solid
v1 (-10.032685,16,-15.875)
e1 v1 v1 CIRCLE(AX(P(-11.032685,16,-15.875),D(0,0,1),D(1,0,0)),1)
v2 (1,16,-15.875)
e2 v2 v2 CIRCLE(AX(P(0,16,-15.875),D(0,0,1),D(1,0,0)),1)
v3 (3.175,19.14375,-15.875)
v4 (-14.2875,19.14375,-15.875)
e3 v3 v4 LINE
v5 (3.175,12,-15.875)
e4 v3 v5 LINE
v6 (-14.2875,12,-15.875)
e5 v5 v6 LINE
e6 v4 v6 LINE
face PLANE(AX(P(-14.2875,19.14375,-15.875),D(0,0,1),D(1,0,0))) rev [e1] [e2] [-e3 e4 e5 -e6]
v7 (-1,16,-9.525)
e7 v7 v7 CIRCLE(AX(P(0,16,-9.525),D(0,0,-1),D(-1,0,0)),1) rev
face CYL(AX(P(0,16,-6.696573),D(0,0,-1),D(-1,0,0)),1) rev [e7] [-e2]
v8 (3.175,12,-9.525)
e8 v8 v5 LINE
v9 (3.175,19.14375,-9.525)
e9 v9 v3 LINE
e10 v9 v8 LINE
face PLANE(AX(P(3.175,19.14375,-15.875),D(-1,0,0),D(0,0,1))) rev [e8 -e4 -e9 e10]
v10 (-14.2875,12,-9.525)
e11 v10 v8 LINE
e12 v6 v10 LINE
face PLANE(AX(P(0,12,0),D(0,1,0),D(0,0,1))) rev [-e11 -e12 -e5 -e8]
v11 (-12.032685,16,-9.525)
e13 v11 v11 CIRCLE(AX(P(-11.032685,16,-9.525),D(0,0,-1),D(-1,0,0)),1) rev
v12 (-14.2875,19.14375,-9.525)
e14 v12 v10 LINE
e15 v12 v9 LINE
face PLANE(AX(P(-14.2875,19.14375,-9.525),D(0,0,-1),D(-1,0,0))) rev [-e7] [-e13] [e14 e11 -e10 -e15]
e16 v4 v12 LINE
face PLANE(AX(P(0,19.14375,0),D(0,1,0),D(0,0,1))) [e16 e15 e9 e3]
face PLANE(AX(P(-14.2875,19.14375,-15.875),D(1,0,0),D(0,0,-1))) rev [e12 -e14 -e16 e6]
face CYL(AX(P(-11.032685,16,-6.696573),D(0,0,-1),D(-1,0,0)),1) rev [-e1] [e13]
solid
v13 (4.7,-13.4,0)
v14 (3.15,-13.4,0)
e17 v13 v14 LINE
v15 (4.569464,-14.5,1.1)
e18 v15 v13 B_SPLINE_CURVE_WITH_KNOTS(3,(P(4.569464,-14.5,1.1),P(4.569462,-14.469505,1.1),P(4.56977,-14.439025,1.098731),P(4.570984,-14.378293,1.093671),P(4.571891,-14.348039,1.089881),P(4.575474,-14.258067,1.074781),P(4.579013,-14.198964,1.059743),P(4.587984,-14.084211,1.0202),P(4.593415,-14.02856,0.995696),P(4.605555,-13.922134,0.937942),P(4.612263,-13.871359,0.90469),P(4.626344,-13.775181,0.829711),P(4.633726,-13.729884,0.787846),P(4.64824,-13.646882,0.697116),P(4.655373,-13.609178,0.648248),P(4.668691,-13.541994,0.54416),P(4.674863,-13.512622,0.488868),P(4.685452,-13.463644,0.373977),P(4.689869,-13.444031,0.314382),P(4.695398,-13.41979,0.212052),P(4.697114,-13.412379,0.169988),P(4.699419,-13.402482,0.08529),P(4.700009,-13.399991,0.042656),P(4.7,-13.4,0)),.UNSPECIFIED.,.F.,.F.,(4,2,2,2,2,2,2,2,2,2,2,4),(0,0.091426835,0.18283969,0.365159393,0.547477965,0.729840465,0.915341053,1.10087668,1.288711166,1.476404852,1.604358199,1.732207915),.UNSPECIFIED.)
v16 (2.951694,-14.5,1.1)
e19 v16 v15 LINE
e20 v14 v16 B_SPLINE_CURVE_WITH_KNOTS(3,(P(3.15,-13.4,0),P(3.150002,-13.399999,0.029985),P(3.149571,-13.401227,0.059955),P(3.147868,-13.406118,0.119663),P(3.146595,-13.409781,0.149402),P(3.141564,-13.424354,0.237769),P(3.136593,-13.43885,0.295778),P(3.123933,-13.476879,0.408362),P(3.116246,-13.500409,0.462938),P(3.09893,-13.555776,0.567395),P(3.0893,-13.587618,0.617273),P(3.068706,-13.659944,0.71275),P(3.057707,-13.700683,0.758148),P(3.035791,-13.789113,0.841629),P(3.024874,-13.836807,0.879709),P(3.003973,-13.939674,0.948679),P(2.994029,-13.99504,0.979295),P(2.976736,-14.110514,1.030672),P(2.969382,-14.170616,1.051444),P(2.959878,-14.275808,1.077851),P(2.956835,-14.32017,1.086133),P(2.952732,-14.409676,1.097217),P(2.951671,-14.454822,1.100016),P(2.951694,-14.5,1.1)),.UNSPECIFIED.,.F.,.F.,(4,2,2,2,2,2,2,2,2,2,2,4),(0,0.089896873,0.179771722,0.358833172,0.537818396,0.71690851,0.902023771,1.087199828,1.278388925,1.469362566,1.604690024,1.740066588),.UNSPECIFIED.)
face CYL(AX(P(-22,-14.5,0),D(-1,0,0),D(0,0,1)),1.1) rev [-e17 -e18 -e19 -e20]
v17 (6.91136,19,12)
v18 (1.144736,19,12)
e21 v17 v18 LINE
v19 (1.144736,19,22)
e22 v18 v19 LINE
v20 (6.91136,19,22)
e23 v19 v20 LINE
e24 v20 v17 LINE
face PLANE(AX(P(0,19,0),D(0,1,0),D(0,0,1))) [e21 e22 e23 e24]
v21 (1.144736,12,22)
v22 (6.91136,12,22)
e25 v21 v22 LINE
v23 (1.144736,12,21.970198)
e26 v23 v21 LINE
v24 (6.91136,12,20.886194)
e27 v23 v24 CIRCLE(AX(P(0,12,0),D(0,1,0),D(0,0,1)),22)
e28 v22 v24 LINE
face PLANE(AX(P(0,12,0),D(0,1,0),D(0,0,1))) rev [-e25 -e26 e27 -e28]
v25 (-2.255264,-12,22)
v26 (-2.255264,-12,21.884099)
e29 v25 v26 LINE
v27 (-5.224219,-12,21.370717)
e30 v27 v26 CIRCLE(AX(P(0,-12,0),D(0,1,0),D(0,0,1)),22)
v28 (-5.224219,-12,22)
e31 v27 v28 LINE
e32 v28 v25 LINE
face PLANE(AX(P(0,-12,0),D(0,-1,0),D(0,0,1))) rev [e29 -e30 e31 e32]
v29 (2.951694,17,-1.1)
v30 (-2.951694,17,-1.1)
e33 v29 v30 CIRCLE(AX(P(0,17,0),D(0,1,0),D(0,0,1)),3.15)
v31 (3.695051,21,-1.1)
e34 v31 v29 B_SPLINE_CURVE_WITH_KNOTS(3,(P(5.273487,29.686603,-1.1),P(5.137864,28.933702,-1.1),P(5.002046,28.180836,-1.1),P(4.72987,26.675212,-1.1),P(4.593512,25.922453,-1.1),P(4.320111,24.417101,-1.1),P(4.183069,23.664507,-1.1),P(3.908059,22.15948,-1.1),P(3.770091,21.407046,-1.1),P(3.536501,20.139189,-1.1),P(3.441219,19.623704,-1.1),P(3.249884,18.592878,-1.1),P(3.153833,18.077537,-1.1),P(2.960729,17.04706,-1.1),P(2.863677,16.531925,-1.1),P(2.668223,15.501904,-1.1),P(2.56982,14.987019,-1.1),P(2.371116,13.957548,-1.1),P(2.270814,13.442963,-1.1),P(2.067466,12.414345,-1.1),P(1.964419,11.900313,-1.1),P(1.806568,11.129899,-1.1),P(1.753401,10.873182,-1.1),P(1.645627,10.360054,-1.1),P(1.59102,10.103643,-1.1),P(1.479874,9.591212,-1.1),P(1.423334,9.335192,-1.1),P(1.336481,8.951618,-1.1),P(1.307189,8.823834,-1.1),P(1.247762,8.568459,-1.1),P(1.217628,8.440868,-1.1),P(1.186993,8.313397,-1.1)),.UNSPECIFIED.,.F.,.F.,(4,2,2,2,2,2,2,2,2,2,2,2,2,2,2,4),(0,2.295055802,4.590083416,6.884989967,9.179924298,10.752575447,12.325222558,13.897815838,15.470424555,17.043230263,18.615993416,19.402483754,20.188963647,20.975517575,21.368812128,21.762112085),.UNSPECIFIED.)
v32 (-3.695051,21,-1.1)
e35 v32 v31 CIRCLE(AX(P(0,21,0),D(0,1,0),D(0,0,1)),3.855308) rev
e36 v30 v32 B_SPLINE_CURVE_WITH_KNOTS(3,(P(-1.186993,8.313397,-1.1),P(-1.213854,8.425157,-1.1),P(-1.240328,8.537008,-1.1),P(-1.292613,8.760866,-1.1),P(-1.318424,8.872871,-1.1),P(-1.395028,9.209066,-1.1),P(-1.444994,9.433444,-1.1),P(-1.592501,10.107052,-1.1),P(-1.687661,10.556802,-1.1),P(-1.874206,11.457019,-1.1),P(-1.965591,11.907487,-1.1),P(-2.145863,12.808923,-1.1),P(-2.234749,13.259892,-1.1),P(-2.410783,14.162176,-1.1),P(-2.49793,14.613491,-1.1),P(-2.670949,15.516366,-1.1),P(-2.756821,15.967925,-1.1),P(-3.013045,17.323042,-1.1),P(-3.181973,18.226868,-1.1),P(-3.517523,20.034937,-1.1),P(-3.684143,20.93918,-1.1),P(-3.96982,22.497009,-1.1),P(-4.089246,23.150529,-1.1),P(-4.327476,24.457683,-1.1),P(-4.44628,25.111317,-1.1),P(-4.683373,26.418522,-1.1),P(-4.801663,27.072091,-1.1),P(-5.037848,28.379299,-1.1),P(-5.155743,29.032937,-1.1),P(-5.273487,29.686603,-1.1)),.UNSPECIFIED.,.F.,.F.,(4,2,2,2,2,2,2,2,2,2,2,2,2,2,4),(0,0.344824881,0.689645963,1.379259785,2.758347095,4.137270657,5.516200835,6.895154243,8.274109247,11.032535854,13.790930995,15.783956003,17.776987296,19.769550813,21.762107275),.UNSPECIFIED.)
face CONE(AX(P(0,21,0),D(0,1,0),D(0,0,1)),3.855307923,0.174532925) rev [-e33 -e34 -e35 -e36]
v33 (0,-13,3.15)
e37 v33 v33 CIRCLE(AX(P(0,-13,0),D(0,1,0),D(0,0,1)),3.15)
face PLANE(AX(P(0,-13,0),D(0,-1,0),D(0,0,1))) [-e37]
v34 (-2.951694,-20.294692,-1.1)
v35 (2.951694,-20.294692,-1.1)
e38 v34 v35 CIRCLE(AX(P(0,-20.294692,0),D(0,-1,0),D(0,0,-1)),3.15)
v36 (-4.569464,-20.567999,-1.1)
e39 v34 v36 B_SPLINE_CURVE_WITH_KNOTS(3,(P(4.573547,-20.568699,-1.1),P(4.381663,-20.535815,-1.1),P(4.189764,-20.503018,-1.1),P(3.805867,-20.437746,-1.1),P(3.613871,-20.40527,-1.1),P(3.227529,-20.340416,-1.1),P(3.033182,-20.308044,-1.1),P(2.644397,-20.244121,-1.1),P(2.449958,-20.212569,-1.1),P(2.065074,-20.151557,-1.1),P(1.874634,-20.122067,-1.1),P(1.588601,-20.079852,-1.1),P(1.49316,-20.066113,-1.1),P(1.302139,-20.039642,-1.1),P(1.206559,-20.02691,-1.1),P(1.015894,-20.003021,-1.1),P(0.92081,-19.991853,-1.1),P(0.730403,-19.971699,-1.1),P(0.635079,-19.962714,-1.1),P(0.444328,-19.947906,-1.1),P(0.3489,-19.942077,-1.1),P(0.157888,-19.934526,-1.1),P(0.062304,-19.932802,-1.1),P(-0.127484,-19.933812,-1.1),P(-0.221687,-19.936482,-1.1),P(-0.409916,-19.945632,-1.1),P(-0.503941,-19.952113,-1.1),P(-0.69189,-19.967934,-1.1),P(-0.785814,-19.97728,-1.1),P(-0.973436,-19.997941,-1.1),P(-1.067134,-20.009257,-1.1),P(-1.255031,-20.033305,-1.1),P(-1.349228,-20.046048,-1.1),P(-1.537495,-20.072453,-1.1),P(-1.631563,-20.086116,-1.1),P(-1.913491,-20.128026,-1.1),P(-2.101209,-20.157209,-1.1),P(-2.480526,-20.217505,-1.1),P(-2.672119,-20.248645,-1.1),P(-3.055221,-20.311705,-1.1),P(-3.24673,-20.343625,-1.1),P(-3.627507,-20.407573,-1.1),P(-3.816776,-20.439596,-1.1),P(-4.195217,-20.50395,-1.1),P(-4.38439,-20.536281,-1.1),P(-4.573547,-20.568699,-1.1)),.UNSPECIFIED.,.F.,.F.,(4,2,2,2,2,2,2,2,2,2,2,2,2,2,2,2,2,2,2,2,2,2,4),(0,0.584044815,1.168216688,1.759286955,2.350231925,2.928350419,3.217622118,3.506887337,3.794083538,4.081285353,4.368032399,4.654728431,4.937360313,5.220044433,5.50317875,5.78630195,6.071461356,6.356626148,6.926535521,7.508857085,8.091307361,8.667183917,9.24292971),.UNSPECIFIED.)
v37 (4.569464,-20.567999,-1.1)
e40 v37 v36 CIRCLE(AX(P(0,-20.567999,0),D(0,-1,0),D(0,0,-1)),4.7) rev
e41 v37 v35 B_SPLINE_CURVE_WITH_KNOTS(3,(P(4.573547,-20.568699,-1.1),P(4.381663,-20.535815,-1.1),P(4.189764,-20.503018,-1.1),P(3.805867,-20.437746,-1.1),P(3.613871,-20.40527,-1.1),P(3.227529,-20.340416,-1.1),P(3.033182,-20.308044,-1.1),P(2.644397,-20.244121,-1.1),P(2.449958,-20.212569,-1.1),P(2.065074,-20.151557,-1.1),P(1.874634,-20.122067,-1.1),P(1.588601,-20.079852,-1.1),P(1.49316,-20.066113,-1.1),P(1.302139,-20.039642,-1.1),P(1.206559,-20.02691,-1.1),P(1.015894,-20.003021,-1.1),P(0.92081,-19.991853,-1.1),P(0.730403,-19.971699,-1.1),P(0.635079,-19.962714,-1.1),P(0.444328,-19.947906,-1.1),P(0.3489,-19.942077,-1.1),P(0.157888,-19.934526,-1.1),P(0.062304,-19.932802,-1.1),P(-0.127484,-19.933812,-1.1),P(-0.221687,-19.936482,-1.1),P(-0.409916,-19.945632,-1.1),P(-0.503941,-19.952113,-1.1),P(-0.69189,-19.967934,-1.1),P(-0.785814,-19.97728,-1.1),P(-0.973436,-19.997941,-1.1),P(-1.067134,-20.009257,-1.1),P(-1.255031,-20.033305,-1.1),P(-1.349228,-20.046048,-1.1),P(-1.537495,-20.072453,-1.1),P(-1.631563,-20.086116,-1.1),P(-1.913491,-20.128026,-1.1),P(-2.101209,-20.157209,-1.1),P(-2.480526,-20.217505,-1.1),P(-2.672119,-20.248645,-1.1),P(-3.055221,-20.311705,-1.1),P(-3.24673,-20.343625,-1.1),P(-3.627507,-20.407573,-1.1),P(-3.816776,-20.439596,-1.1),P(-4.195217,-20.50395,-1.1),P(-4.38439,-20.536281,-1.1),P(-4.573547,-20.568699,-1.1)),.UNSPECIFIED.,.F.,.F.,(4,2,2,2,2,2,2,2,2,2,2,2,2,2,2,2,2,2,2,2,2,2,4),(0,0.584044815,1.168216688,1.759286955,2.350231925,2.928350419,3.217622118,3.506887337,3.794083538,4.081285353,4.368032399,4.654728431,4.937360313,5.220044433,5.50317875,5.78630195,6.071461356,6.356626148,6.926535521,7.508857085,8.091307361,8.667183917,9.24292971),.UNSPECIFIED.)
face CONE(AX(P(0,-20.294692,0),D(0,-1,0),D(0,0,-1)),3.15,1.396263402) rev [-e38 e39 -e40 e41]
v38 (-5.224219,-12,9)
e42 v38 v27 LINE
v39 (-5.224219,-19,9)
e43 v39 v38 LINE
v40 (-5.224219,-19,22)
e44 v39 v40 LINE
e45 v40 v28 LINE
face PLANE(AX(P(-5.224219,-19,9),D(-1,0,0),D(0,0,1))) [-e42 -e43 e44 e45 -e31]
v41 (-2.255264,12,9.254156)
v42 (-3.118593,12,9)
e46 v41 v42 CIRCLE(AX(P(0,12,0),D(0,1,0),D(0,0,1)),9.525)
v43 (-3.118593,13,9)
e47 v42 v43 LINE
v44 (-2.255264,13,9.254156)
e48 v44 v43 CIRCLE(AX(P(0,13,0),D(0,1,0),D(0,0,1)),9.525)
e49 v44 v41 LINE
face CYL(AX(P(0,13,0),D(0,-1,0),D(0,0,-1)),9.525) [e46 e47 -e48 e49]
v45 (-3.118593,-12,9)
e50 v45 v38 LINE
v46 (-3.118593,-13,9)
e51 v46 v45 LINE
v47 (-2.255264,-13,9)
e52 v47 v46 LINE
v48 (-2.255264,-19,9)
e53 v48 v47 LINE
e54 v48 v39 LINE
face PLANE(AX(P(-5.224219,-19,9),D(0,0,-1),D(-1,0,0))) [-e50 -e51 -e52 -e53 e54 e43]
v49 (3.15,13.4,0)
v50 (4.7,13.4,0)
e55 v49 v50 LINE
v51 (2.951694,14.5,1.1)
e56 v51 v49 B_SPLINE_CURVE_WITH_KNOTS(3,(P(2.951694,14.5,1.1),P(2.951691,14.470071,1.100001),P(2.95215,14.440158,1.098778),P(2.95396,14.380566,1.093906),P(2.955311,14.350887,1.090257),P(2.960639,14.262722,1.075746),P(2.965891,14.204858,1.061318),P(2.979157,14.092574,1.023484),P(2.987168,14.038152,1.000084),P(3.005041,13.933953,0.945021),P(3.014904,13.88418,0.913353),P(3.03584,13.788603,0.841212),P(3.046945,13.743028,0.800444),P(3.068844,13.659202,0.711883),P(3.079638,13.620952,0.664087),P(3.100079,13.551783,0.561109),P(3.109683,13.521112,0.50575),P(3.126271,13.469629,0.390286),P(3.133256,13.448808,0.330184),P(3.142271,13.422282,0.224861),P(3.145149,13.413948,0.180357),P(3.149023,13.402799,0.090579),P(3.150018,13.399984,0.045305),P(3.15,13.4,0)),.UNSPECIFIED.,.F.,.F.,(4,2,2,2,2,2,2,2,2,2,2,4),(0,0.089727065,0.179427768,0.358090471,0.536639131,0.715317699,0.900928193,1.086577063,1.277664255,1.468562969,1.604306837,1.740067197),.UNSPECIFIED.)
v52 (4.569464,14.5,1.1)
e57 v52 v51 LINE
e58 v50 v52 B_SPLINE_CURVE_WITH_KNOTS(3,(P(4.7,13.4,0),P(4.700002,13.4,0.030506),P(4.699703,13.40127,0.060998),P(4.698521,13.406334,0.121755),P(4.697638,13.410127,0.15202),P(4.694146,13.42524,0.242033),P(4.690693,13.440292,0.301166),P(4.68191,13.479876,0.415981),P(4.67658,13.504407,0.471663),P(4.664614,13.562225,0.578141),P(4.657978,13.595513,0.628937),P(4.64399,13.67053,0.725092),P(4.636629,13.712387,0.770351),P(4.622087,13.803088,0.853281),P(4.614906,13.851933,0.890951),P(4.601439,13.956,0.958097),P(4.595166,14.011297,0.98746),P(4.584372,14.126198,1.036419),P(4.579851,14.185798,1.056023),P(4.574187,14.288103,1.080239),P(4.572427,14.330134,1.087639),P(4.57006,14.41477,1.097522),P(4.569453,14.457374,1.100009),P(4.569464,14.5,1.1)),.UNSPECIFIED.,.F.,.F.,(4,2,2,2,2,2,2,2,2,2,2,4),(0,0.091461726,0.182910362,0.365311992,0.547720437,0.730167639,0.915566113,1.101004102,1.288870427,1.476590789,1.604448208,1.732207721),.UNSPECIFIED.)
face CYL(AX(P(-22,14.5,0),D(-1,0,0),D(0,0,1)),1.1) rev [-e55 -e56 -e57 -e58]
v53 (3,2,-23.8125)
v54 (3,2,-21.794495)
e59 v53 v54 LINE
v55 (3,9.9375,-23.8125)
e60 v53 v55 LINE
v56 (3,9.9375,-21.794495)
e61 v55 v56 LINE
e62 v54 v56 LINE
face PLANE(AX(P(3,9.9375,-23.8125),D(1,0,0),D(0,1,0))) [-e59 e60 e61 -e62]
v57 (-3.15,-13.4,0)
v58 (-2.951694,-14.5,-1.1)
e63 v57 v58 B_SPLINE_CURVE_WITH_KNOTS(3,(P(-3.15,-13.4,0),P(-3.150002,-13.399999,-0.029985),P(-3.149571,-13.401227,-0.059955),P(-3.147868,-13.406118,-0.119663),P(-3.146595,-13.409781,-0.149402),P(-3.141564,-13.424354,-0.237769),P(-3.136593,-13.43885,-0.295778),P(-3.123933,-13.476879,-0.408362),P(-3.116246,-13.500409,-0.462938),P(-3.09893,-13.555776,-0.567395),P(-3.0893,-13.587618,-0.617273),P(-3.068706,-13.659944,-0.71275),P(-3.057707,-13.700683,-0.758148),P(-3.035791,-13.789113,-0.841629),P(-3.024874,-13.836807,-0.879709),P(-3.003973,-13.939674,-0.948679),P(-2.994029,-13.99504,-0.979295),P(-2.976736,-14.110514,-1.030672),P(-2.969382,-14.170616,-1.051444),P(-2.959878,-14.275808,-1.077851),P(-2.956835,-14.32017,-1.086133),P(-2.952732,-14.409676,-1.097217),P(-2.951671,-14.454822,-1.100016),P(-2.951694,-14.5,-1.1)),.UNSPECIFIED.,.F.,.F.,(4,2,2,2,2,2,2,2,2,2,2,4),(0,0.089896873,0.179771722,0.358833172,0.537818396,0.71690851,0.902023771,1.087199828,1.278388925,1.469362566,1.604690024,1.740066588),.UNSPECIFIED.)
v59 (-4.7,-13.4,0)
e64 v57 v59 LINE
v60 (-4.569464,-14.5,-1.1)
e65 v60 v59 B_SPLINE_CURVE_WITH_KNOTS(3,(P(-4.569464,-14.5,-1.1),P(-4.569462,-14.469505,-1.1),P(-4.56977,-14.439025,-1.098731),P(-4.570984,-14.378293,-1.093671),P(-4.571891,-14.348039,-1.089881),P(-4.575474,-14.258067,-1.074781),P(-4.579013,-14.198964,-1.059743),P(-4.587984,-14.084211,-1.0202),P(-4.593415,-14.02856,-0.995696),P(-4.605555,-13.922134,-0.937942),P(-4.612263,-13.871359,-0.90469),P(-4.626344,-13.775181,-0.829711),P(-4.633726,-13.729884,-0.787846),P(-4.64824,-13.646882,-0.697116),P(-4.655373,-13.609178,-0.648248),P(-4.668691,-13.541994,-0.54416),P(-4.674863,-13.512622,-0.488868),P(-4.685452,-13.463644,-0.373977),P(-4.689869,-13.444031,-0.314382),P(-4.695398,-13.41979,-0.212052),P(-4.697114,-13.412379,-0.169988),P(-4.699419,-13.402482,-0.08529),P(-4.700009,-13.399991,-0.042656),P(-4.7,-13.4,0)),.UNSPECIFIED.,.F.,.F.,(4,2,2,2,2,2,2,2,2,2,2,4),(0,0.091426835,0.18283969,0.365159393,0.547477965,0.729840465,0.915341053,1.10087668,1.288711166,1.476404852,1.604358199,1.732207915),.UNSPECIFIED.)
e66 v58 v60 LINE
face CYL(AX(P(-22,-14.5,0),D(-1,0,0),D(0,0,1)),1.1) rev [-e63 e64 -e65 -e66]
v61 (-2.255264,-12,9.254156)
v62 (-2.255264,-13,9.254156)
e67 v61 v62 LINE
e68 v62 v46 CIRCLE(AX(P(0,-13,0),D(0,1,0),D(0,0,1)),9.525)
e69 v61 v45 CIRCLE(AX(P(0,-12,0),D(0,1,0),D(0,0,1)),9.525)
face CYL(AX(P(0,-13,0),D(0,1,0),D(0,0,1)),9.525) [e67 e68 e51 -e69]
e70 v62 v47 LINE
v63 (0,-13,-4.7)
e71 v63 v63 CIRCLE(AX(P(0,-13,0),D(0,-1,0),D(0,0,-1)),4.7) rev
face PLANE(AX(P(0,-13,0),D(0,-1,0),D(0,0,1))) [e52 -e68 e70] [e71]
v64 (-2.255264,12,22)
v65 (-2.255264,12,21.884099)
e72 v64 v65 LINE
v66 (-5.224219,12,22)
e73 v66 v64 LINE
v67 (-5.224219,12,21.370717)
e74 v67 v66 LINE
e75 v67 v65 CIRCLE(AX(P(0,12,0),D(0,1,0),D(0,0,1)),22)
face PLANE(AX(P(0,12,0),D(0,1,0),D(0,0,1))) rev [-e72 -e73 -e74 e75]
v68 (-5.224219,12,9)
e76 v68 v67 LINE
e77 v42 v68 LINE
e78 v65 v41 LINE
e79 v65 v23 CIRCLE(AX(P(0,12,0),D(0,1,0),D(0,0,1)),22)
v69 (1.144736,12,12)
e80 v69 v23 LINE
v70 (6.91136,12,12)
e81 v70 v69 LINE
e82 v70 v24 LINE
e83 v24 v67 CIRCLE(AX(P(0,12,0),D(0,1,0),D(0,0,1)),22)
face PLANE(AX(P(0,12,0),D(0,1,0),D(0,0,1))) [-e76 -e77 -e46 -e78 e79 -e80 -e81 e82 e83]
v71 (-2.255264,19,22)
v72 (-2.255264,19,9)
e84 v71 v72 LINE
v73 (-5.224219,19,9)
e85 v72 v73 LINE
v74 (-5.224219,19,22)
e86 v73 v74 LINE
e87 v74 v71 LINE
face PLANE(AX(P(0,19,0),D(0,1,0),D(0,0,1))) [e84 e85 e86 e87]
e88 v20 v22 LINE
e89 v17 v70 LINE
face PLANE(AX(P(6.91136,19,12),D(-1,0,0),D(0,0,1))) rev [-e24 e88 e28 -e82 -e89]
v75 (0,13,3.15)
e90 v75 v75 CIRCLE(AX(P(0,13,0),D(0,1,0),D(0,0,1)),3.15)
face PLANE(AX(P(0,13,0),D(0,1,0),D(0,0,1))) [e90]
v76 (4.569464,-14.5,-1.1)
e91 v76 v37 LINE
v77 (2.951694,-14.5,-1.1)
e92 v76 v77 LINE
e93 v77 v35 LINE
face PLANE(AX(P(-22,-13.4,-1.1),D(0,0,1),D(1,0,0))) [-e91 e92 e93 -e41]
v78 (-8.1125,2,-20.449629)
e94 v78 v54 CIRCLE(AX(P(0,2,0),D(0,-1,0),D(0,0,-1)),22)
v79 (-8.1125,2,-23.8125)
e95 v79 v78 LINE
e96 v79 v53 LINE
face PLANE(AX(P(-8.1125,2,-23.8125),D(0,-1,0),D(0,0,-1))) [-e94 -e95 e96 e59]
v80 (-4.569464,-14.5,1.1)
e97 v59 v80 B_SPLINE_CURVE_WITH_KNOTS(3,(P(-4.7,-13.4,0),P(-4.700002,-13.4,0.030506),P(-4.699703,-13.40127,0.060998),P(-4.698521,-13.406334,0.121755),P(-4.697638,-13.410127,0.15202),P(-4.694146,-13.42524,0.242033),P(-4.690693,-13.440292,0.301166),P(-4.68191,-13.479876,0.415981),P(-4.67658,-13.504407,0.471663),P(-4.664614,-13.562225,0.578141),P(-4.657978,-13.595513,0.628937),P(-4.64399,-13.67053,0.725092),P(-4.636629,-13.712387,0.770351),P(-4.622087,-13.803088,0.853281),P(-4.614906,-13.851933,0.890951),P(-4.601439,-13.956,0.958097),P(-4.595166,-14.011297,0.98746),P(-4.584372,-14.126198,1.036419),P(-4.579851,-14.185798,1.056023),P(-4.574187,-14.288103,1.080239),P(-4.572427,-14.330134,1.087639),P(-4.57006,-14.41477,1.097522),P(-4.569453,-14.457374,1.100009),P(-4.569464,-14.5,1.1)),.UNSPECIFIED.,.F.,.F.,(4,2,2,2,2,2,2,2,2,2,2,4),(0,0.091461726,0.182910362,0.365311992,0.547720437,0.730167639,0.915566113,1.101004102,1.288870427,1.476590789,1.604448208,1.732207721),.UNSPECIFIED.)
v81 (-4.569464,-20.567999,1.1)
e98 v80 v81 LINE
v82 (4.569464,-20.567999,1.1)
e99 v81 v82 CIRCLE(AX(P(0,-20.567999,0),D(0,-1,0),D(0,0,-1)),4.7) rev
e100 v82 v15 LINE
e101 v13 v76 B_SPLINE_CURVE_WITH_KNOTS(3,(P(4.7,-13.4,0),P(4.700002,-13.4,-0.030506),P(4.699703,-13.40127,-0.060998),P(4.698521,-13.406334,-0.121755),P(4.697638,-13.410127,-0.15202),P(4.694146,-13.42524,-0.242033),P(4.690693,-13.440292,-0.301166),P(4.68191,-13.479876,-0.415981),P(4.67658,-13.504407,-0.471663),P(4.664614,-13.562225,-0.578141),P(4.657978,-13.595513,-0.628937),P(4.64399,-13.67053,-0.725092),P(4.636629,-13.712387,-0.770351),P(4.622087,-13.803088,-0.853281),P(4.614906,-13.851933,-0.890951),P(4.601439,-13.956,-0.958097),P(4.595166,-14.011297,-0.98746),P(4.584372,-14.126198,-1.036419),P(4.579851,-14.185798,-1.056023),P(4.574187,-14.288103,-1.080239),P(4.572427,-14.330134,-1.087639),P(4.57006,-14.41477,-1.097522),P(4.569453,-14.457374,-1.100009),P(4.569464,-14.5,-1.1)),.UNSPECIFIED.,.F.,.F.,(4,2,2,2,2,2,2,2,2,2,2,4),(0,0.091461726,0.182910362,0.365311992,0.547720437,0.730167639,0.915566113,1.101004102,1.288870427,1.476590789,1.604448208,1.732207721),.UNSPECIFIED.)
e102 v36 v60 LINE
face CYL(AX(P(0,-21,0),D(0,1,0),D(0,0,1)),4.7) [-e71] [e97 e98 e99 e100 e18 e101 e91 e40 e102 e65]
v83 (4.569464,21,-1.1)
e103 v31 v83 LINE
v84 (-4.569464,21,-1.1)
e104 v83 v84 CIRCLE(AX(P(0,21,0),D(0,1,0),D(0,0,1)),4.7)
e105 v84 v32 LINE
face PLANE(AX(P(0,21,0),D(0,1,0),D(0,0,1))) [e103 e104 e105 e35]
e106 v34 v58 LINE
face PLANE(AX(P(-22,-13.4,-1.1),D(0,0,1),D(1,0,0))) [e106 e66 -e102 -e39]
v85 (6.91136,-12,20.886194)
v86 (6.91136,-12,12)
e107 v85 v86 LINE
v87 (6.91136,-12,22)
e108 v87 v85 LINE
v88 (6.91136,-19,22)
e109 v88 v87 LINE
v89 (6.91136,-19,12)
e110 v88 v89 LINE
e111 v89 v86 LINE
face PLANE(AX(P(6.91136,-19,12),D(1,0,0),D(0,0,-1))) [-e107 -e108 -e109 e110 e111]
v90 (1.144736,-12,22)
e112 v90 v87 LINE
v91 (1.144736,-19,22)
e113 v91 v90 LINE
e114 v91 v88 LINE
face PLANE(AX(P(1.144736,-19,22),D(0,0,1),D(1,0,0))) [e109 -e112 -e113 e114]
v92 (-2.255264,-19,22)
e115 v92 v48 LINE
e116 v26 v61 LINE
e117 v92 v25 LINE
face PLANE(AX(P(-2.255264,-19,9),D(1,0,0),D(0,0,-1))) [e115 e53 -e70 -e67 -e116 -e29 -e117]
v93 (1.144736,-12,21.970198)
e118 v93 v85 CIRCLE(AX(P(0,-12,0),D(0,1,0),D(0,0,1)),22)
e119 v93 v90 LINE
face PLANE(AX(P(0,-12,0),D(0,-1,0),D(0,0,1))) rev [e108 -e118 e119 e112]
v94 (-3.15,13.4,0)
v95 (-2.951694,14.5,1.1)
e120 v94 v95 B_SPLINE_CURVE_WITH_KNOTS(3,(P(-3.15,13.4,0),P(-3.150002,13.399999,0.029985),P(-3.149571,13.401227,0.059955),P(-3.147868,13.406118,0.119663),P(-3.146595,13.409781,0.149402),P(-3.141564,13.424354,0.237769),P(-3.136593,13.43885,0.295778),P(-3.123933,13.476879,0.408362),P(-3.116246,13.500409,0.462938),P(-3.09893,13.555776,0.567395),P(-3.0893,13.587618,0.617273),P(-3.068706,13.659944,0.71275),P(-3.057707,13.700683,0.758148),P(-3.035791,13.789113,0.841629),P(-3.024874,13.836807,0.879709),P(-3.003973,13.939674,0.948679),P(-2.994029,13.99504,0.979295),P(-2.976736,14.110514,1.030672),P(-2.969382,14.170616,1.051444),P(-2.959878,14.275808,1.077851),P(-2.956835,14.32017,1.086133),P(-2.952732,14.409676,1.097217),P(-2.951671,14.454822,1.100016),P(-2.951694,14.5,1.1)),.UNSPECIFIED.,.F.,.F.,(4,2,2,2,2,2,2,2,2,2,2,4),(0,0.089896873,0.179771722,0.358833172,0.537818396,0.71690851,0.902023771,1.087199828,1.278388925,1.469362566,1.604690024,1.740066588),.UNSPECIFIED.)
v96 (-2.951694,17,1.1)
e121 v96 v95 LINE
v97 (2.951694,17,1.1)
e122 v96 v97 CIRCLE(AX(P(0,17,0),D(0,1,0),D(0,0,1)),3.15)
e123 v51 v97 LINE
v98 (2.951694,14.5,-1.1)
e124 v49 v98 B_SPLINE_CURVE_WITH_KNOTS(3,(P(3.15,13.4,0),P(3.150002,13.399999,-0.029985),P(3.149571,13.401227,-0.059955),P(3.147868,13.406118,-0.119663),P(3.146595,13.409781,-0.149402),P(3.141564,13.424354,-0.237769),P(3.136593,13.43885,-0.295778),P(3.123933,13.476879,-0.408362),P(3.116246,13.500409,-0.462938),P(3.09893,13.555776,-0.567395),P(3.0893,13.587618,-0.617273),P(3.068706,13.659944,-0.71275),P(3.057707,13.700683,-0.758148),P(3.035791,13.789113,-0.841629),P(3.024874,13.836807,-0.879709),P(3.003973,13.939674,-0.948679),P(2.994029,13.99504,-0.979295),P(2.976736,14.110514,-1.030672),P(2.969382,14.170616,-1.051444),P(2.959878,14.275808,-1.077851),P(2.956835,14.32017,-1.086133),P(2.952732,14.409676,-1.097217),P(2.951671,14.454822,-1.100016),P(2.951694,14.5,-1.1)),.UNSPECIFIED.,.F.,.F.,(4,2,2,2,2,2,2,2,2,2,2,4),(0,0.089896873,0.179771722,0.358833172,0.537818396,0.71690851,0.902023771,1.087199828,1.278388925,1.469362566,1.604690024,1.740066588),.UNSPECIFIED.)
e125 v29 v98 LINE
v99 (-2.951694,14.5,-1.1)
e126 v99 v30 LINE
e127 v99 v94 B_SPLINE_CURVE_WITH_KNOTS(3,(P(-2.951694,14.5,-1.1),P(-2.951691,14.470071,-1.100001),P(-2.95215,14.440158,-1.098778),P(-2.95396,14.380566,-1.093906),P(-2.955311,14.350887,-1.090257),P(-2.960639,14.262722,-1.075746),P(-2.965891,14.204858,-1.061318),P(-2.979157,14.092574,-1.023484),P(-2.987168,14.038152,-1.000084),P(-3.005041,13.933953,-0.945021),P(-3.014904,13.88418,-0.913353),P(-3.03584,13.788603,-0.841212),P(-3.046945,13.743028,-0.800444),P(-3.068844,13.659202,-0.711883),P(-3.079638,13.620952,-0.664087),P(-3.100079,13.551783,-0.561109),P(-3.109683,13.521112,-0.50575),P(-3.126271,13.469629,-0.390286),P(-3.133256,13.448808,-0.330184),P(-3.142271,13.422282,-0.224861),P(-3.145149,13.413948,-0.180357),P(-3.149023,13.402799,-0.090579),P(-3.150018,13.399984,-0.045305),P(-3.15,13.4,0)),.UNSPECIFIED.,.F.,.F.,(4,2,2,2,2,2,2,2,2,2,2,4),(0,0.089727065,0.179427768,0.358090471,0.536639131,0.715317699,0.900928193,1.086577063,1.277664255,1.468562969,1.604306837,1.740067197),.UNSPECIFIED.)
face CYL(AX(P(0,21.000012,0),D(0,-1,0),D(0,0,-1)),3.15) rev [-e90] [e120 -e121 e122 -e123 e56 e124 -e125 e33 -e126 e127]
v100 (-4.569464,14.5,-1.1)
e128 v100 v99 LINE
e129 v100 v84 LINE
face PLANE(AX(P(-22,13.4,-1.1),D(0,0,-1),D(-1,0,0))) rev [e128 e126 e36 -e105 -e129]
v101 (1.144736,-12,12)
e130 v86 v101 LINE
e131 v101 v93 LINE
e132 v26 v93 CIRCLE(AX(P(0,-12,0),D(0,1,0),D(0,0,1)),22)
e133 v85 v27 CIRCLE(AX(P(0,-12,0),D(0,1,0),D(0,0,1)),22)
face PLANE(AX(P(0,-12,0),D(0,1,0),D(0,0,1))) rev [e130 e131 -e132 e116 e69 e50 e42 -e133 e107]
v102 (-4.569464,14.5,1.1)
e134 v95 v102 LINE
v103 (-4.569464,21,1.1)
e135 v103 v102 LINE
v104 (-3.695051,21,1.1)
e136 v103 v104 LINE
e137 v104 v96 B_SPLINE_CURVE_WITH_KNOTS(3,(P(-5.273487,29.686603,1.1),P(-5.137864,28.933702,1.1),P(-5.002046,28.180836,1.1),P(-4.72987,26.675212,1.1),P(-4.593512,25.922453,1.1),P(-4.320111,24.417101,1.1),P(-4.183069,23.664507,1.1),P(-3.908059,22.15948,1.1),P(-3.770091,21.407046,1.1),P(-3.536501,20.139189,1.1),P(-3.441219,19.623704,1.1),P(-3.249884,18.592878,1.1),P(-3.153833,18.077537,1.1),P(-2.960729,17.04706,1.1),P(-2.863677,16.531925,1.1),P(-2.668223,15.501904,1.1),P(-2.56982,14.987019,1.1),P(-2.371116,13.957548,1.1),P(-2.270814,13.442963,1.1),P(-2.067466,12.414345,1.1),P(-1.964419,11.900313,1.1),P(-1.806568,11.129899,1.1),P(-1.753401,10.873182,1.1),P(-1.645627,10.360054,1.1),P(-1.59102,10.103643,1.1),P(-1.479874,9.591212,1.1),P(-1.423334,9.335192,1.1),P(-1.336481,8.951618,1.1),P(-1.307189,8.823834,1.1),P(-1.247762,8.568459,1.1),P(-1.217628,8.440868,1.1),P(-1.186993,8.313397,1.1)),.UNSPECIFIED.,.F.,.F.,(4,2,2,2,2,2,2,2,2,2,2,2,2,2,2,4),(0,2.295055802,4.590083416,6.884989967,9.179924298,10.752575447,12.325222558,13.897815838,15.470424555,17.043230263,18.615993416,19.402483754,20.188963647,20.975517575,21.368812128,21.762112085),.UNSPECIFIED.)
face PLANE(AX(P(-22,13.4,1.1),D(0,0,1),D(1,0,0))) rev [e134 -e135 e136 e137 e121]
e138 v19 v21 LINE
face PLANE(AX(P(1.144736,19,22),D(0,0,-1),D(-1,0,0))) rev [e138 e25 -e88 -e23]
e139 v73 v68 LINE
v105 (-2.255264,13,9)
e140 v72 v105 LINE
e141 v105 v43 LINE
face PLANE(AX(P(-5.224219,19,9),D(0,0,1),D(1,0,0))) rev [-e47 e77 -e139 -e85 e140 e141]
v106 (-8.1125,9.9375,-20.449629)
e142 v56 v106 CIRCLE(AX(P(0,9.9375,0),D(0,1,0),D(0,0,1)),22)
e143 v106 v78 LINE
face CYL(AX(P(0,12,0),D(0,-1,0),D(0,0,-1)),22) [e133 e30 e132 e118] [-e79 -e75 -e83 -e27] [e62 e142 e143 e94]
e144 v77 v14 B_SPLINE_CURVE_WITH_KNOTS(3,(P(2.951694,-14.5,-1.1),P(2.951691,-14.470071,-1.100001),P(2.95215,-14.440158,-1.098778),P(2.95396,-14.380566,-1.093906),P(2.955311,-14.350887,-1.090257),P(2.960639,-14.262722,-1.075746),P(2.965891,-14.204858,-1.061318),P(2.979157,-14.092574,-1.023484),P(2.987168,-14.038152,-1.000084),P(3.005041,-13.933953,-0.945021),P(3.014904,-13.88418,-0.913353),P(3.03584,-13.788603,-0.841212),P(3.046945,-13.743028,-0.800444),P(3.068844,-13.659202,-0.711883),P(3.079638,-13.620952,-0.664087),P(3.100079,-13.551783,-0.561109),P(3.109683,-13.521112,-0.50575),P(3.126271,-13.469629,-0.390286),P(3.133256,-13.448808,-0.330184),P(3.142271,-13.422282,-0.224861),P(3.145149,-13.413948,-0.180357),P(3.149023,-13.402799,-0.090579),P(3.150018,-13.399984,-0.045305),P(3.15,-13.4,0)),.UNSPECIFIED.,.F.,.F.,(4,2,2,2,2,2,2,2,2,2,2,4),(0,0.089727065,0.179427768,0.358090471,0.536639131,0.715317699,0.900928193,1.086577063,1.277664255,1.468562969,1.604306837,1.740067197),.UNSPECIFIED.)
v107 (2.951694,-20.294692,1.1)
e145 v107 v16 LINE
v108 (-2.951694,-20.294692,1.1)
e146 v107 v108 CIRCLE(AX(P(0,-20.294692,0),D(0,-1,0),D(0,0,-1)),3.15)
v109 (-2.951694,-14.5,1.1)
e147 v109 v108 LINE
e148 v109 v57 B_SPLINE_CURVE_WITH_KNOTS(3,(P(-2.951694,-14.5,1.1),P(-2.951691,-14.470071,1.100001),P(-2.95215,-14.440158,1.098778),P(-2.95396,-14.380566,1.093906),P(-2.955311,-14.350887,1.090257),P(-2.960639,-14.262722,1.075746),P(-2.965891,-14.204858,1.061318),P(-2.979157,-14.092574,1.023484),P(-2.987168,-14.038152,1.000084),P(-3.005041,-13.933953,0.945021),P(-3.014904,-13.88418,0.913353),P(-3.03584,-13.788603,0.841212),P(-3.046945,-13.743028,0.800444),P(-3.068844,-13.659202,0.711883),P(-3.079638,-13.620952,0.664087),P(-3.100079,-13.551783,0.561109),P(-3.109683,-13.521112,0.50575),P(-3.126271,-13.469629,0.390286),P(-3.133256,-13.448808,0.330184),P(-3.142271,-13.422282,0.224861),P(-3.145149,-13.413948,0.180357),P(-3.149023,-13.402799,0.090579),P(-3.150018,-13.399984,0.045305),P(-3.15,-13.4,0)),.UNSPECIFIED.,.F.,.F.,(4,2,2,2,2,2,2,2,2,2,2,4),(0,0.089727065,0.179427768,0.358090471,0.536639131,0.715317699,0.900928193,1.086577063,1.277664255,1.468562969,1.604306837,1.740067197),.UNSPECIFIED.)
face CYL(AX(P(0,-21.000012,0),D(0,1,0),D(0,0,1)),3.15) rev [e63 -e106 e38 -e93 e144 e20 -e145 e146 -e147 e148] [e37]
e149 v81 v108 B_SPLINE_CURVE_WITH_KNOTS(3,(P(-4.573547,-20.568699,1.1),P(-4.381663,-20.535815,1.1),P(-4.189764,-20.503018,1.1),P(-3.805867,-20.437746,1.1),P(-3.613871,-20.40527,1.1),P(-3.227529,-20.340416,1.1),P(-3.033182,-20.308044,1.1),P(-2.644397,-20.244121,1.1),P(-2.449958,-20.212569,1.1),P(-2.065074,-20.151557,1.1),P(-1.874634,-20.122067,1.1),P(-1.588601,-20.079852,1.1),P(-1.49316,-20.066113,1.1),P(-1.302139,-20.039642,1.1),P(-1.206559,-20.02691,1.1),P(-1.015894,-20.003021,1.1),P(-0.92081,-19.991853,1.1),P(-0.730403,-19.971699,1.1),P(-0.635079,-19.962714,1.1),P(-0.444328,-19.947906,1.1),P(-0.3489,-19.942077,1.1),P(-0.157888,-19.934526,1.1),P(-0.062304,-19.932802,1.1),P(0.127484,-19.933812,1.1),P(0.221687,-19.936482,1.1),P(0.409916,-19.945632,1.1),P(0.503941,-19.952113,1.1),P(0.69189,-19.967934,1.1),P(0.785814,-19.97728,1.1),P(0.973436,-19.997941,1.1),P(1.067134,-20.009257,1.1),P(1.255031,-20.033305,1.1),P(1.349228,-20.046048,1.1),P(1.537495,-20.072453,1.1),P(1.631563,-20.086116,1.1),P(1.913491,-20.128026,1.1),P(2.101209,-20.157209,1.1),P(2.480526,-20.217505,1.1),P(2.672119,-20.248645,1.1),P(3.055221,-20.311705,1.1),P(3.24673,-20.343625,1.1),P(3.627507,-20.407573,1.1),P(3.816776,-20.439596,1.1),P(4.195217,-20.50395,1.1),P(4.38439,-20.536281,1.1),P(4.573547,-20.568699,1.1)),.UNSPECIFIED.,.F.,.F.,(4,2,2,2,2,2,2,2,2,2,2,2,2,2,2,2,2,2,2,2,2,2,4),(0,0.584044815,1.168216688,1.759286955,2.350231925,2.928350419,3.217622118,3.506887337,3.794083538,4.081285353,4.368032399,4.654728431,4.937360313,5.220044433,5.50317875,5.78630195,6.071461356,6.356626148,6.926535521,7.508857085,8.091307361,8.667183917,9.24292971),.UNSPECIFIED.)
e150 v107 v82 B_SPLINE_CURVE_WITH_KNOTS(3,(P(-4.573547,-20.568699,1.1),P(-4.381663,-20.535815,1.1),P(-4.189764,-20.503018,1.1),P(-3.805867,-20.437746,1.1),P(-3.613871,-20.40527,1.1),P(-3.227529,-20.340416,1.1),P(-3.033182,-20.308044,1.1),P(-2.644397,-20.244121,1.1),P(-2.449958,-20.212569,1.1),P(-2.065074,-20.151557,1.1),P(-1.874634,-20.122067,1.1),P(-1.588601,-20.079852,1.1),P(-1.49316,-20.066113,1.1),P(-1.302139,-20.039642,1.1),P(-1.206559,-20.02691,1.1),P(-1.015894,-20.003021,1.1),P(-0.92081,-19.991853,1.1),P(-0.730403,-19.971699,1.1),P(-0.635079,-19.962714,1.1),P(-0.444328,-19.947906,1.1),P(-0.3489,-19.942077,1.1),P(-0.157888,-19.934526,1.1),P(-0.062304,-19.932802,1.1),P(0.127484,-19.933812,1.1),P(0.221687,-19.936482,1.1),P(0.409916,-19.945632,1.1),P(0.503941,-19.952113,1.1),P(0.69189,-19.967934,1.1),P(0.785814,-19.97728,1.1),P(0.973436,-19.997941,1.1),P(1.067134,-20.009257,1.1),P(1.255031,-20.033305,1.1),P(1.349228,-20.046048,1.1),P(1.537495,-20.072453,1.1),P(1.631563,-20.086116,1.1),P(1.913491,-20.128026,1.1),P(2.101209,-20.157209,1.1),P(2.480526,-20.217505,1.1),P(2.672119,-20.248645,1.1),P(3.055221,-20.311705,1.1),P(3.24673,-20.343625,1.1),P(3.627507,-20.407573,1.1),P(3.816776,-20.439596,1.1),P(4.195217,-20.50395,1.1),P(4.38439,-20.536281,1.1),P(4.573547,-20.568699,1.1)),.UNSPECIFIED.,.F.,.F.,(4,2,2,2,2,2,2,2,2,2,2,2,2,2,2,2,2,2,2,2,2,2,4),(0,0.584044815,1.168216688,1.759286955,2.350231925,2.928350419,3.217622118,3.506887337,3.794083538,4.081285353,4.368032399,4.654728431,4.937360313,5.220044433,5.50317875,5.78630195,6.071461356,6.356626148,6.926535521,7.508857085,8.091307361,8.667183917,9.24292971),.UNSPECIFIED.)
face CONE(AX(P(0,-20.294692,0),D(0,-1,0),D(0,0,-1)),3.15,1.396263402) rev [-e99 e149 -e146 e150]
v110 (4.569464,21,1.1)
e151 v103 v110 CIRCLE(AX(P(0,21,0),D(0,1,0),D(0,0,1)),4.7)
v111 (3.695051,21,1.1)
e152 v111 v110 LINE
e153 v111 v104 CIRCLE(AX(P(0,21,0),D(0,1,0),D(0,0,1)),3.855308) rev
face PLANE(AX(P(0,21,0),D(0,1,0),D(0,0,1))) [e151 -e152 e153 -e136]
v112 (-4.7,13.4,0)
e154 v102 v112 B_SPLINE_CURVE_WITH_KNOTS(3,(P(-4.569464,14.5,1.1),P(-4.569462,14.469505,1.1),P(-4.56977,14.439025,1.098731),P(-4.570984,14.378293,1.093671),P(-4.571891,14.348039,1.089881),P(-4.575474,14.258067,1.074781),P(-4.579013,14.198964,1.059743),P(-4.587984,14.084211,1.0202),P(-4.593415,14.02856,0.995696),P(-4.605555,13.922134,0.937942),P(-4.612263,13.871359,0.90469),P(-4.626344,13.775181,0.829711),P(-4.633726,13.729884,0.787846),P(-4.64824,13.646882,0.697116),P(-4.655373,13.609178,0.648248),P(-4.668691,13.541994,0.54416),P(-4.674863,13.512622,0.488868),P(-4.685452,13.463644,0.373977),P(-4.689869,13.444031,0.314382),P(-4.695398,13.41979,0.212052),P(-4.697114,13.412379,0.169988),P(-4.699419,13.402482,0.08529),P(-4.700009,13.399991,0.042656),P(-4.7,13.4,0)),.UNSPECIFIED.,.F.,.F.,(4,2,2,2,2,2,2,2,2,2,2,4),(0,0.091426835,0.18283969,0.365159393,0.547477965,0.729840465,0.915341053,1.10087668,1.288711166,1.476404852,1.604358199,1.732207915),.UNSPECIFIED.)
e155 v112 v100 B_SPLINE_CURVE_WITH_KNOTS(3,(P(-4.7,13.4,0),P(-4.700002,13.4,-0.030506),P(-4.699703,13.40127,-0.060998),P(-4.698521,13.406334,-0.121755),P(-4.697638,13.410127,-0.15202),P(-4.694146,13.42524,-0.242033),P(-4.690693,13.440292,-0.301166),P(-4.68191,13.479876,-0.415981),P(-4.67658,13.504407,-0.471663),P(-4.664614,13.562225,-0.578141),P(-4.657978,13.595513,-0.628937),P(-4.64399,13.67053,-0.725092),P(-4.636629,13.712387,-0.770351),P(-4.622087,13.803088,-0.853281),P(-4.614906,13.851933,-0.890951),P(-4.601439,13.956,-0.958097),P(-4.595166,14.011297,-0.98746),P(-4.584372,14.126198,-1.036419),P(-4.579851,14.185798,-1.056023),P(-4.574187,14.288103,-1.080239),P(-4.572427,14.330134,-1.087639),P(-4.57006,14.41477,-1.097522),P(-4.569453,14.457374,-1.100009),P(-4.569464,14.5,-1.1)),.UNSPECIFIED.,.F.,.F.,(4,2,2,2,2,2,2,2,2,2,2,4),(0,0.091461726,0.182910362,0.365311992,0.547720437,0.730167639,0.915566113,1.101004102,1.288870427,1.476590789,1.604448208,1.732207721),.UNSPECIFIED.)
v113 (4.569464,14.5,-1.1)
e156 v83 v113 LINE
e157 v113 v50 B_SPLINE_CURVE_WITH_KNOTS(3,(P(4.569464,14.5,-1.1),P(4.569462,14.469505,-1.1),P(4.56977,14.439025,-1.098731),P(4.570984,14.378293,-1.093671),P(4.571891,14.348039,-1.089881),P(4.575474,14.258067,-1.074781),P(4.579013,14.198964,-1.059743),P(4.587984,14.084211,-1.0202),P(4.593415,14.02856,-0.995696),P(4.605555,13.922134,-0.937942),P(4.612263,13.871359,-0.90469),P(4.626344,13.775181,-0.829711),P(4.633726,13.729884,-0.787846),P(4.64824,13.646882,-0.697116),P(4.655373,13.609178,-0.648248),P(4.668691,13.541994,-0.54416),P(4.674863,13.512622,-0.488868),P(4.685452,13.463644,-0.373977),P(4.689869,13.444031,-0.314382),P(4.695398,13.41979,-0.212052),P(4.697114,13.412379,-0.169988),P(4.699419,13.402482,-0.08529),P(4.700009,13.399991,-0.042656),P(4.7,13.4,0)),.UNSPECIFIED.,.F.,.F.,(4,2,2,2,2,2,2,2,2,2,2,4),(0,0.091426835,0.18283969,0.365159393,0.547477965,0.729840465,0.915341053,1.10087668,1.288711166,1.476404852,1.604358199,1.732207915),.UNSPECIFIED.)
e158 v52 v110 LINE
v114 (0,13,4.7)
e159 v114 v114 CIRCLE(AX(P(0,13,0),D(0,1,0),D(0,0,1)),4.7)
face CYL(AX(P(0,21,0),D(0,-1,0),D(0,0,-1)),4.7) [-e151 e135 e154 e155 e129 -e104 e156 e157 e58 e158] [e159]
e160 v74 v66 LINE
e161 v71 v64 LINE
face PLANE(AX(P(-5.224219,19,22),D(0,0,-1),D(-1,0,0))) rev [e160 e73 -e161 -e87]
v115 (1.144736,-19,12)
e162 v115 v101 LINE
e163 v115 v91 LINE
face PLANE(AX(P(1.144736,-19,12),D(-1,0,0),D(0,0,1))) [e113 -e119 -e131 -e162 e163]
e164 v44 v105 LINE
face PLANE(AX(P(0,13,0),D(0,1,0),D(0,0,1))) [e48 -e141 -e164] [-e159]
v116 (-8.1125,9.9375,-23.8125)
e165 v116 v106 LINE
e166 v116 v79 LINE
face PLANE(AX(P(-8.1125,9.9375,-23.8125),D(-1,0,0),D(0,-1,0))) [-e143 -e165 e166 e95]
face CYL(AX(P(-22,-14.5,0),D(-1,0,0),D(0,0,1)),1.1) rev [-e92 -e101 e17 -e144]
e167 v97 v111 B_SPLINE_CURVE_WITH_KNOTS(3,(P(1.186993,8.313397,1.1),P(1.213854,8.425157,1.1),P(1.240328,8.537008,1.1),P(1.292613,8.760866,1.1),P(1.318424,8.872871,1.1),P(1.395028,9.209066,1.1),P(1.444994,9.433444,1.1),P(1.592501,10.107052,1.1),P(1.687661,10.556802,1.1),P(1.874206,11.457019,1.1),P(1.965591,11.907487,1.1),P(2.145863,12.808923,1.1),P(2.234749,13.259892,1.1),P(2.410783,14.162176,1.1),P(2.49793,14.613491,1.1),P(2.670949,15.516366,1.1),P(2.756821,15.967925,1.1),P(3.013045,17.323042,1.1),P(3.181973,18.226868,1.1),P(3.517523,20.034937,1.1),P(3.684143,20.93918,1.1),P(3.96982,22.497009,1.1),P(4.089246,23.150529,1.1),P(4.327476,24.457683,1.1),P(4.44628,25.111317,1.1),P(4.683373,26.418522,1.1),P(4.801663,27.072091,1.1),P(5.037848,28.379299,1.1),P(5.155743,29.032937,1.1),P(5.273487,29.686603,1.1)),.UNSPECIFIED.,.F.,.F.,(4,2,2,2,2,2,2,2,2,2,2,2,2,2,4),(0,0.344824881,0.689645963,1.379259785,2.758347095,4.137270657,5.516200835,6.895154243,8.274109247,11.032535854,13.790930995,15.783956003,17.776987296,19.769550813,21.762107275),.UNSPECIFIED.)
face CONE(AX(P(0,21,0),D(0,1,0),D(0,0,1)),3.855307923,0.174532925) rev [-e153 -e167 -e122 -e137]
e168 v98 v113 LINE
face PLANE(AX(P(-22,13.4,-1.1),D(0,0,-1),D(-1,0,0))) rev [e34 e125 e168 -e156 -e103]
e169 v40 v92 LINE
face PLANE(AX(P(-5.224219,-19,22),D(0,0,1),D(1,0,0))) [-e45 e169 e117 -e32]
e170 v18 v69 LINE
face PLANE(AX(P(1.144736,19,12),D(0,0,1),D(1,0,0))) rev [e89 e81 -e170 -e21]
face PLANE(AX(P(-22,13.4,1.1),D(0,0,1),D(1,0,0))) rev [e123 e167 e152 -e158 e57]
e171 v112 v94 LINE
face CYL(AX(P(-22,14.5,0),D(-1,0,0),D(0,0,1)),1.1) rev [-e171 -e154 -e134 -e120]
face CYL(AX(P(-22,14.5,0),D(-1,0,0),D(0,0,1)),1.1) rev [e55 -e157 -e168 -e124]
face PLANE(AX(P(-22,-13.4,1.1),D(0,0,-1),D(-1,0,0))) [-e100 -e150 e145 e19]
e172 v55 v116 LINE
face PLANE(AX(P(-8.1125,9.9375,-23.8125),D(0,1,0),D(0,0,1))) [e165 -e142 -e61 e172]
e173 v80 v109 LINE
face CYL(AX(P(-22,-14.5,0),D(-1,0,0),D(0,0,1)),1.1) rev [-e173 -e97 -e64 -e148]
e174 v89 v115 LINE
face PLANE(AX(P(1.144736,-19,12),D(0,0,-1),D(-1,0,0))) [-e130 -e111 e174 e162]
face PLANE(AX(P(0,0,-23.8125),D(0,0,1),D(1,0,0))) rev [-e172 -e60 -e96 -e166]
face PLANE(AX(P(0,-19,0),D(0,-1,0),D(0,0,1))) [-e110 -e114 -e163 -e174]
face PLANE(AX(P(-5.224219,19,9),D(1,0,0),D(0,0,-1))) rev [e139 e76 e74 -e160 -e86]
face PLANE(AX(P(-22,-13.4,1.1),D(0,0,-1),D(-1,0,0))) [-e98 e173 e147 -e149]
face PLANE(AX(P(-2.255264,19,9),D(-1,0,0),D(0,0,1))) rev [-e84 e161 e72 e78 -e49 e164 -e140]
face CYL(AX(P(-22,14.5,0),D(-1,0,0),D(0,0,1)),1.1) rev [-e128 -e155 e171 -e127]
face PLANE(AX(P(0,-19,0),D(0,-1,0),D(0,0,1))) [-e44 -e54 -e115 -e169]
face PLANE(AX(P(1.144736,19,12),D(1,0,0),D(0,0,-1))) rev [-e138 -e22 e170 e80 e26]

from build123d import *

# Parameters (mm, degrees)
SKETCH1_R               = 22
BOSS_EXTRUDE1_DEPTH     = 12
SKETCH2_W               = 2.968955178
SKETCH2_H               = 13
SKETCH2_W_2             = 5.766624481
SKETCH2_H_2             = 10
BOSS_EXTRUDE2_DEPTH     = 7
SKETCH3_R               = 4.7
BOSS_EXTRUDE3_DEPTH     = 9
SKETCH5_R               = 9.525
BOSS_EXTRUDE4_DEPTH     = 1
CUT_EXTRUDE1_START      = -8
SKETCH6_R               = 3.15
CUT_EXTRUDE1_DEPTH      = 54.354161882
CHAMFER1_SIZE           = 4
CHAMFER1_SIZE2          = 0.705307923
SKETCH7_W               = 2.2
SKETCH7_H               = 7.6
CUT_EXTRUDE2_DEPTH      = 38.536648758
FILLET1_R               = 1.1
SKETCH8_W               = 17.4625
SKETCH8_H               = 6.35
BOSS_EXTRUDE6_DEPTH     = 7.14375
SKETCH9_W               = 11.1125
SKETCH9_H               = 7.9375
BOSS_EXTRUDE7_DEPTH     = 23.8125
CUT_EXTRUDE3_DEPTH      = 49.574845643
CUT_EXTRUDE3_DEPTH_BACK = 6.35
SKETCH10_R              = 1
MIRROR6_OUTLINE_W       = 9.525
MIRROR6_OUTLINE_H       = 1
MIRROR6_START           = -19
MIRROR6_2_OUTLINE_W     = 2.968955178
MIRROR6_2_OUTLINE_H     = 13
MIRROR6_2_OUTLINE_W_2   = 5.766624481
MIRROR6_2_OUTLINE_H_2   = 10
MIRROR6_2_DEPTH         = 7
MIRROR6_START_2         = -20.567999245
MIRROR6_3_DEPTH         = 1.567999245
MIRROR6_START_3         = -14.5000001
MIRROR6_4_DEPTH         = 1.5000001
MIRROR6_START_4         = -6
MIRROR6_5_DEPTH         = 12


with BuildPart() as part:
    # Sketch1 → Boss-Extrude1 (new, symmetric)
    with BuildSketch(Plane(origin=(0, 0, 0), x_dir=(1, 0, 0), z_dir=(0, 1, 0))):
        with Locations(Location((0, 0, 0), (0, 0, 270))):
            Circle(SKETCH1_R)
    extrude(amount=BOSS_EXTRUDE1_DEPTH, both=True)

    # Sketch2 → Boss-Extrude2 (add)
    with BuildSketch(Plane(origin=(0, 12, 0), x_dir=(1, 0, 0), z_dir=(0, 1, 0))):
        with Locations((-3.739741619, -15.5)):
            Rectangle(SKETCH2_W, SKETCH2_H)
        with Locations((4.02804821, -17)):
            Rectangle(SKETCH2_W_2, SKETCH2_H_2)
    extrude(amount=BOSS_EXTRUDE2_DEPTH)

    # Sketch3 → Boss-Extrude3 (add)
    with BuildSketch(Plane(origin=(0, 12, 0), x_dir=(1, 0, 0), z_dir=(0, 1, 0))):
        with Locations(Location((0, 0, 0), (0, 0, 270))):
            Circle(SKETCH3_R)
    extrude(amount=BOSS_EXTRUDE3_DEPTH)

    # Sketch5 → Boss-Extrude4 (add)
    with BuildSketch(Plane(origin=(0, 12, 0), x_dir=(1, 0, 0), z_dir=(0, 1, 0))):
        Circle(SKETCH5_R)
    extrude(amount=BOSS_EXTRUDE4_DEPTH)

    # Sketch6 → Cut-Extrude1 (cut)
    with BuildSketch(Plane(origin=(0, 21, 0), x_dir=(1, 0, 0), z_dir=(0, 1, 0)).offset(CUT_EXTRUDE1_START)):
        with Locations(Location((0, 0, 0), (0, 0, 90))):
            Circle(SKETCH6_R)
    extrude(amount=CUT_EXTRUDE1_DEPTH, mode=Mode.SUBTRACT)

    # Chamfer1
    chamfer1_edges = [part.edges().sort_by_distance(p)[0] for p in [
        (0, 21, 3.15),
    ]]
    chamfer1_side = [part.faces().sort_by_distance(p)[0] for p in [
        (0, 17, 3.15),
    ]]
    chamfer(chamfer1_edges, length=CHAMFER1_SIZE, length2=CHAMFER1_SIZE2, reference=chamfer1_side[0])

    # Sketch7 → Cut-Extrude2 (cut, symmetric)
    with BuildSketch(Plane(origin=(0, 0, 0), x_dir=(0, 0, -1), z_dir=(1, 0, 0))):
        with Locations((0, 17.2)):
            Rectangle(SKETCH7_W, SKETCH7_H)
    extrude(amount=CUT_EXTRUDE2_DEPTH, both=True, mode=Mode.SUBTRACT)

    # Fillet1
    fillet1_edges = [part.edges().sort_by_distance(p)[0] for p in [
        (3.760579146, 13.4, -1.1),
        (-3.760579146, 13.4, -1.1),
        (3.760579146, 13.4, 1.1),
        (-3.760579146, 13.4, 1.1),
    ]]
    fillet(fillet1_edges, radius=FILLET1_R - 0.0001)  # a hair under: the kernel refuses the full size

    # Sketch9 → Boss-Extrude7 (add)
    with BuildSketch(Plane.XY):
        with Locations((-2.55625, 5.96875)):
            Rectangle(SKETCH9_W, SKETCH9_H)
    extrude(amount=-BOSS_EXTRUDE7_DEPTH)

    # Mirror6: read off the stored shape, not the designer's step
    # Mirror6 outline → Mirror6 (revolve)
    with BuildSketch(Plane.XY):
        with Locations((4.7625, -12.5)):
            Rectangle(MIRROR6_OUTLINE_W, MIRROR6_OUTLINE_H)
    revolve(axis=Axis((0, 0, 0), (0, 1, 0)))

    # Mirror6 2 outline → Mirror6 2 (add)
    with BuildSketch(Plane(origin=(0, 0, 0), x_dir=(1, 0, 0), z_dir=(0, 1, 0)).offset(MIRROR6_START)):
        with BuildLine():
            Line((2.951694429, 1.1), (4.569463864, 1.1))
            ThreePointArc((4.569463864, 1.1), (0, 4.7), (-4.569463864, 1.1))
            Line((-4.569463864, 1.1), (-2.951694429, 1.1))
            ThreePointArc((-2.951694429, 1.1), (0, 3.15), (2.951694429, 1.1))
        make_face()
        with BuildLine():
            ThreePointArc((-4.569463864, -1.1), (0, -4.7), (4.569463864, -1.1))
            Line((4.569463864, -1.1), (2.951694429, -1.1))
            ThreePointArc((2.951694429, -1.1), (0, -3.15), (-2.951694429, -1.1))
            Line((-2.951694429, -1.1), (-4.569463864, -1.1))
        make_face()
        with Locations((-3.739741619, -15.5)):
            Rectangle(MIRROR6_2_OUTLINE_W, MIRROR6_2_OUTLINE_H)
        with Locations((4.02804821, -17)):
            Rectangle(MIRROR6_2_OUTLINE_W_2, MIRROR6_2_OUTLINE_H_2)
    extrude(amount=MIRROR6_2_DEPTH)

    # Mirror6 3 outline → Mirror6 3 (add)
    with BuildSketch(Plane(origin=(0, 0, 0), x_dir=(1, 0, 0), z_dir=(0, 1, 0)).offset(MIRROR6_START_2)):
        with BuildLine():
            Line((2.951694429, 1.1), (4.569463864, 1.1))
            ThreePointArc((4.569463864, 1.1), (0, 4.7), (-4.569463864, 1.1))
            Line((-4.569463864, 1.1), (-2.951694429, 1.1))
            ThreePointArc((-2.951694429, 1.1), (0, 3.15), (2.951694429, 1.1))
        make_face()
        with BuildLine():
            ThreePointArc((-4.569463864, -1.1), (0, -4.7), (4.569463864, -1.1))
            Line((4.569463864, -1.1), (2.951694429, -1.1))
            ThreePointArc((2.951694429, -1.1), (0, -3.15), (-2.951694429, -1.1))
            Line((-2.951694429, -1.1), (-4.569463864, -1.1))
        make_face()
    extrude(amount=MIRROR6_3_DEPTH)

    # Mirror6 4 outline → Mirror6 4 (add)
    with BuildSketch(Plane(origin=(0, 0, 0), x_dir=(1, 0, 0), z_dir=(0, 1, 0)).offset(MIRROR6_START_3)):
        with BuildLine():
            ThreePointArc((4.569463864, -1.1), (4.7, 0), (4.569463864, 1.1))
            Line((4.569463864, 1.1), (2.951694429, 1.1))
            ThreePointArc((2.951694429, 1.1), (3.15, 0), (2.951694429, -1.1))
            Line((2.951694429, -1.1), (4.569463864, -1.1))
        make_face()
        with BuildLine():
            Line((-2.951694429, 1.1), (-4.569463864, 1.1))
            ThreePointArc((-4.569463864, 1.1), (-4.7, 0), (-4.569463864, -1.1))
            Line((-4.569463864, -1.1), (-2.951694429, -1.1))
            ThreePointArc((-2.951694429, -1.1), (-3.15, 0), (-2.951694429, 1.1))
        make_face()
    extrude(amount=MIRROR6_4_DEPTH)

    # Mirror6 5 outline → Mirror6 5 (cut)
    with BuildSketch(Plane.YZ.offset(MIRROR6_START_4)):
        with BuildLine():
            ThreePointArc((-13.4, 0), (-13.722182541, 0.777817459), (-14.5, 1.1))
            Line((-14.5, 1.1), (-14.5, -1.1))
            ThreePointArc((-14.5, -1.1), (-13.722182541, -0.777817459), (-13.4, 0))
        make_face()
    extrude(amount=MIRROR6_5_DEPTH, mode=Mode.SUBTRACT)

    # Mirror6 6 outline → Mirror6 6 (revolve, cut)
    with BuildSketch(Plane.XY):
        Polygon((4.700000002, -20.567998898), (3.14999999, -20.294692075), (3.15, -20.567999245), align=None)
    revolve(axis=Axis((0, 0, 0), (0, 1, 0)), mode=Mode.SUBTRACT)


with BuildPart() as body_2:
    # Sketch8 → Boss-Extrude6 (new body)
    with BuildSketch(Plane(origin=(0, 12, 0), x_dir=(1, 0, 0), z_dir=(0, 1, 0))):
        with Locations((-5.55625, 12.7)):
            Rectangle(SKETCH8_W, SKETCH8_H)
    extrude(amount=BOSS_EXTRUDE6_DEPTH)

    # Sketch10 → Cut-Extrude3 (cut, two sides: drawn at the far end of the back side and taken through both)
    with BuildSketch(Plane(origin=(0, 0, -15.875), x_dir=(-1, 0, 0), z_dir=(0, 0, -1)).offset(-CUT_EXTRUDE3_DEPTH_BACK)):
        with Locations((0, 16)):
            Circle(SKETCH10_R)
        with Locations((11.032684987, 16)):
            Circle(SKETCH10_R)
    extrude(amount=CUT_EXTRUDE3_DEPTH + CUT_EXTRUDE3_DEPTH_BACK, mode=Mode.SUBTRACT)


solid = Compound([part.part, body_2.part])
